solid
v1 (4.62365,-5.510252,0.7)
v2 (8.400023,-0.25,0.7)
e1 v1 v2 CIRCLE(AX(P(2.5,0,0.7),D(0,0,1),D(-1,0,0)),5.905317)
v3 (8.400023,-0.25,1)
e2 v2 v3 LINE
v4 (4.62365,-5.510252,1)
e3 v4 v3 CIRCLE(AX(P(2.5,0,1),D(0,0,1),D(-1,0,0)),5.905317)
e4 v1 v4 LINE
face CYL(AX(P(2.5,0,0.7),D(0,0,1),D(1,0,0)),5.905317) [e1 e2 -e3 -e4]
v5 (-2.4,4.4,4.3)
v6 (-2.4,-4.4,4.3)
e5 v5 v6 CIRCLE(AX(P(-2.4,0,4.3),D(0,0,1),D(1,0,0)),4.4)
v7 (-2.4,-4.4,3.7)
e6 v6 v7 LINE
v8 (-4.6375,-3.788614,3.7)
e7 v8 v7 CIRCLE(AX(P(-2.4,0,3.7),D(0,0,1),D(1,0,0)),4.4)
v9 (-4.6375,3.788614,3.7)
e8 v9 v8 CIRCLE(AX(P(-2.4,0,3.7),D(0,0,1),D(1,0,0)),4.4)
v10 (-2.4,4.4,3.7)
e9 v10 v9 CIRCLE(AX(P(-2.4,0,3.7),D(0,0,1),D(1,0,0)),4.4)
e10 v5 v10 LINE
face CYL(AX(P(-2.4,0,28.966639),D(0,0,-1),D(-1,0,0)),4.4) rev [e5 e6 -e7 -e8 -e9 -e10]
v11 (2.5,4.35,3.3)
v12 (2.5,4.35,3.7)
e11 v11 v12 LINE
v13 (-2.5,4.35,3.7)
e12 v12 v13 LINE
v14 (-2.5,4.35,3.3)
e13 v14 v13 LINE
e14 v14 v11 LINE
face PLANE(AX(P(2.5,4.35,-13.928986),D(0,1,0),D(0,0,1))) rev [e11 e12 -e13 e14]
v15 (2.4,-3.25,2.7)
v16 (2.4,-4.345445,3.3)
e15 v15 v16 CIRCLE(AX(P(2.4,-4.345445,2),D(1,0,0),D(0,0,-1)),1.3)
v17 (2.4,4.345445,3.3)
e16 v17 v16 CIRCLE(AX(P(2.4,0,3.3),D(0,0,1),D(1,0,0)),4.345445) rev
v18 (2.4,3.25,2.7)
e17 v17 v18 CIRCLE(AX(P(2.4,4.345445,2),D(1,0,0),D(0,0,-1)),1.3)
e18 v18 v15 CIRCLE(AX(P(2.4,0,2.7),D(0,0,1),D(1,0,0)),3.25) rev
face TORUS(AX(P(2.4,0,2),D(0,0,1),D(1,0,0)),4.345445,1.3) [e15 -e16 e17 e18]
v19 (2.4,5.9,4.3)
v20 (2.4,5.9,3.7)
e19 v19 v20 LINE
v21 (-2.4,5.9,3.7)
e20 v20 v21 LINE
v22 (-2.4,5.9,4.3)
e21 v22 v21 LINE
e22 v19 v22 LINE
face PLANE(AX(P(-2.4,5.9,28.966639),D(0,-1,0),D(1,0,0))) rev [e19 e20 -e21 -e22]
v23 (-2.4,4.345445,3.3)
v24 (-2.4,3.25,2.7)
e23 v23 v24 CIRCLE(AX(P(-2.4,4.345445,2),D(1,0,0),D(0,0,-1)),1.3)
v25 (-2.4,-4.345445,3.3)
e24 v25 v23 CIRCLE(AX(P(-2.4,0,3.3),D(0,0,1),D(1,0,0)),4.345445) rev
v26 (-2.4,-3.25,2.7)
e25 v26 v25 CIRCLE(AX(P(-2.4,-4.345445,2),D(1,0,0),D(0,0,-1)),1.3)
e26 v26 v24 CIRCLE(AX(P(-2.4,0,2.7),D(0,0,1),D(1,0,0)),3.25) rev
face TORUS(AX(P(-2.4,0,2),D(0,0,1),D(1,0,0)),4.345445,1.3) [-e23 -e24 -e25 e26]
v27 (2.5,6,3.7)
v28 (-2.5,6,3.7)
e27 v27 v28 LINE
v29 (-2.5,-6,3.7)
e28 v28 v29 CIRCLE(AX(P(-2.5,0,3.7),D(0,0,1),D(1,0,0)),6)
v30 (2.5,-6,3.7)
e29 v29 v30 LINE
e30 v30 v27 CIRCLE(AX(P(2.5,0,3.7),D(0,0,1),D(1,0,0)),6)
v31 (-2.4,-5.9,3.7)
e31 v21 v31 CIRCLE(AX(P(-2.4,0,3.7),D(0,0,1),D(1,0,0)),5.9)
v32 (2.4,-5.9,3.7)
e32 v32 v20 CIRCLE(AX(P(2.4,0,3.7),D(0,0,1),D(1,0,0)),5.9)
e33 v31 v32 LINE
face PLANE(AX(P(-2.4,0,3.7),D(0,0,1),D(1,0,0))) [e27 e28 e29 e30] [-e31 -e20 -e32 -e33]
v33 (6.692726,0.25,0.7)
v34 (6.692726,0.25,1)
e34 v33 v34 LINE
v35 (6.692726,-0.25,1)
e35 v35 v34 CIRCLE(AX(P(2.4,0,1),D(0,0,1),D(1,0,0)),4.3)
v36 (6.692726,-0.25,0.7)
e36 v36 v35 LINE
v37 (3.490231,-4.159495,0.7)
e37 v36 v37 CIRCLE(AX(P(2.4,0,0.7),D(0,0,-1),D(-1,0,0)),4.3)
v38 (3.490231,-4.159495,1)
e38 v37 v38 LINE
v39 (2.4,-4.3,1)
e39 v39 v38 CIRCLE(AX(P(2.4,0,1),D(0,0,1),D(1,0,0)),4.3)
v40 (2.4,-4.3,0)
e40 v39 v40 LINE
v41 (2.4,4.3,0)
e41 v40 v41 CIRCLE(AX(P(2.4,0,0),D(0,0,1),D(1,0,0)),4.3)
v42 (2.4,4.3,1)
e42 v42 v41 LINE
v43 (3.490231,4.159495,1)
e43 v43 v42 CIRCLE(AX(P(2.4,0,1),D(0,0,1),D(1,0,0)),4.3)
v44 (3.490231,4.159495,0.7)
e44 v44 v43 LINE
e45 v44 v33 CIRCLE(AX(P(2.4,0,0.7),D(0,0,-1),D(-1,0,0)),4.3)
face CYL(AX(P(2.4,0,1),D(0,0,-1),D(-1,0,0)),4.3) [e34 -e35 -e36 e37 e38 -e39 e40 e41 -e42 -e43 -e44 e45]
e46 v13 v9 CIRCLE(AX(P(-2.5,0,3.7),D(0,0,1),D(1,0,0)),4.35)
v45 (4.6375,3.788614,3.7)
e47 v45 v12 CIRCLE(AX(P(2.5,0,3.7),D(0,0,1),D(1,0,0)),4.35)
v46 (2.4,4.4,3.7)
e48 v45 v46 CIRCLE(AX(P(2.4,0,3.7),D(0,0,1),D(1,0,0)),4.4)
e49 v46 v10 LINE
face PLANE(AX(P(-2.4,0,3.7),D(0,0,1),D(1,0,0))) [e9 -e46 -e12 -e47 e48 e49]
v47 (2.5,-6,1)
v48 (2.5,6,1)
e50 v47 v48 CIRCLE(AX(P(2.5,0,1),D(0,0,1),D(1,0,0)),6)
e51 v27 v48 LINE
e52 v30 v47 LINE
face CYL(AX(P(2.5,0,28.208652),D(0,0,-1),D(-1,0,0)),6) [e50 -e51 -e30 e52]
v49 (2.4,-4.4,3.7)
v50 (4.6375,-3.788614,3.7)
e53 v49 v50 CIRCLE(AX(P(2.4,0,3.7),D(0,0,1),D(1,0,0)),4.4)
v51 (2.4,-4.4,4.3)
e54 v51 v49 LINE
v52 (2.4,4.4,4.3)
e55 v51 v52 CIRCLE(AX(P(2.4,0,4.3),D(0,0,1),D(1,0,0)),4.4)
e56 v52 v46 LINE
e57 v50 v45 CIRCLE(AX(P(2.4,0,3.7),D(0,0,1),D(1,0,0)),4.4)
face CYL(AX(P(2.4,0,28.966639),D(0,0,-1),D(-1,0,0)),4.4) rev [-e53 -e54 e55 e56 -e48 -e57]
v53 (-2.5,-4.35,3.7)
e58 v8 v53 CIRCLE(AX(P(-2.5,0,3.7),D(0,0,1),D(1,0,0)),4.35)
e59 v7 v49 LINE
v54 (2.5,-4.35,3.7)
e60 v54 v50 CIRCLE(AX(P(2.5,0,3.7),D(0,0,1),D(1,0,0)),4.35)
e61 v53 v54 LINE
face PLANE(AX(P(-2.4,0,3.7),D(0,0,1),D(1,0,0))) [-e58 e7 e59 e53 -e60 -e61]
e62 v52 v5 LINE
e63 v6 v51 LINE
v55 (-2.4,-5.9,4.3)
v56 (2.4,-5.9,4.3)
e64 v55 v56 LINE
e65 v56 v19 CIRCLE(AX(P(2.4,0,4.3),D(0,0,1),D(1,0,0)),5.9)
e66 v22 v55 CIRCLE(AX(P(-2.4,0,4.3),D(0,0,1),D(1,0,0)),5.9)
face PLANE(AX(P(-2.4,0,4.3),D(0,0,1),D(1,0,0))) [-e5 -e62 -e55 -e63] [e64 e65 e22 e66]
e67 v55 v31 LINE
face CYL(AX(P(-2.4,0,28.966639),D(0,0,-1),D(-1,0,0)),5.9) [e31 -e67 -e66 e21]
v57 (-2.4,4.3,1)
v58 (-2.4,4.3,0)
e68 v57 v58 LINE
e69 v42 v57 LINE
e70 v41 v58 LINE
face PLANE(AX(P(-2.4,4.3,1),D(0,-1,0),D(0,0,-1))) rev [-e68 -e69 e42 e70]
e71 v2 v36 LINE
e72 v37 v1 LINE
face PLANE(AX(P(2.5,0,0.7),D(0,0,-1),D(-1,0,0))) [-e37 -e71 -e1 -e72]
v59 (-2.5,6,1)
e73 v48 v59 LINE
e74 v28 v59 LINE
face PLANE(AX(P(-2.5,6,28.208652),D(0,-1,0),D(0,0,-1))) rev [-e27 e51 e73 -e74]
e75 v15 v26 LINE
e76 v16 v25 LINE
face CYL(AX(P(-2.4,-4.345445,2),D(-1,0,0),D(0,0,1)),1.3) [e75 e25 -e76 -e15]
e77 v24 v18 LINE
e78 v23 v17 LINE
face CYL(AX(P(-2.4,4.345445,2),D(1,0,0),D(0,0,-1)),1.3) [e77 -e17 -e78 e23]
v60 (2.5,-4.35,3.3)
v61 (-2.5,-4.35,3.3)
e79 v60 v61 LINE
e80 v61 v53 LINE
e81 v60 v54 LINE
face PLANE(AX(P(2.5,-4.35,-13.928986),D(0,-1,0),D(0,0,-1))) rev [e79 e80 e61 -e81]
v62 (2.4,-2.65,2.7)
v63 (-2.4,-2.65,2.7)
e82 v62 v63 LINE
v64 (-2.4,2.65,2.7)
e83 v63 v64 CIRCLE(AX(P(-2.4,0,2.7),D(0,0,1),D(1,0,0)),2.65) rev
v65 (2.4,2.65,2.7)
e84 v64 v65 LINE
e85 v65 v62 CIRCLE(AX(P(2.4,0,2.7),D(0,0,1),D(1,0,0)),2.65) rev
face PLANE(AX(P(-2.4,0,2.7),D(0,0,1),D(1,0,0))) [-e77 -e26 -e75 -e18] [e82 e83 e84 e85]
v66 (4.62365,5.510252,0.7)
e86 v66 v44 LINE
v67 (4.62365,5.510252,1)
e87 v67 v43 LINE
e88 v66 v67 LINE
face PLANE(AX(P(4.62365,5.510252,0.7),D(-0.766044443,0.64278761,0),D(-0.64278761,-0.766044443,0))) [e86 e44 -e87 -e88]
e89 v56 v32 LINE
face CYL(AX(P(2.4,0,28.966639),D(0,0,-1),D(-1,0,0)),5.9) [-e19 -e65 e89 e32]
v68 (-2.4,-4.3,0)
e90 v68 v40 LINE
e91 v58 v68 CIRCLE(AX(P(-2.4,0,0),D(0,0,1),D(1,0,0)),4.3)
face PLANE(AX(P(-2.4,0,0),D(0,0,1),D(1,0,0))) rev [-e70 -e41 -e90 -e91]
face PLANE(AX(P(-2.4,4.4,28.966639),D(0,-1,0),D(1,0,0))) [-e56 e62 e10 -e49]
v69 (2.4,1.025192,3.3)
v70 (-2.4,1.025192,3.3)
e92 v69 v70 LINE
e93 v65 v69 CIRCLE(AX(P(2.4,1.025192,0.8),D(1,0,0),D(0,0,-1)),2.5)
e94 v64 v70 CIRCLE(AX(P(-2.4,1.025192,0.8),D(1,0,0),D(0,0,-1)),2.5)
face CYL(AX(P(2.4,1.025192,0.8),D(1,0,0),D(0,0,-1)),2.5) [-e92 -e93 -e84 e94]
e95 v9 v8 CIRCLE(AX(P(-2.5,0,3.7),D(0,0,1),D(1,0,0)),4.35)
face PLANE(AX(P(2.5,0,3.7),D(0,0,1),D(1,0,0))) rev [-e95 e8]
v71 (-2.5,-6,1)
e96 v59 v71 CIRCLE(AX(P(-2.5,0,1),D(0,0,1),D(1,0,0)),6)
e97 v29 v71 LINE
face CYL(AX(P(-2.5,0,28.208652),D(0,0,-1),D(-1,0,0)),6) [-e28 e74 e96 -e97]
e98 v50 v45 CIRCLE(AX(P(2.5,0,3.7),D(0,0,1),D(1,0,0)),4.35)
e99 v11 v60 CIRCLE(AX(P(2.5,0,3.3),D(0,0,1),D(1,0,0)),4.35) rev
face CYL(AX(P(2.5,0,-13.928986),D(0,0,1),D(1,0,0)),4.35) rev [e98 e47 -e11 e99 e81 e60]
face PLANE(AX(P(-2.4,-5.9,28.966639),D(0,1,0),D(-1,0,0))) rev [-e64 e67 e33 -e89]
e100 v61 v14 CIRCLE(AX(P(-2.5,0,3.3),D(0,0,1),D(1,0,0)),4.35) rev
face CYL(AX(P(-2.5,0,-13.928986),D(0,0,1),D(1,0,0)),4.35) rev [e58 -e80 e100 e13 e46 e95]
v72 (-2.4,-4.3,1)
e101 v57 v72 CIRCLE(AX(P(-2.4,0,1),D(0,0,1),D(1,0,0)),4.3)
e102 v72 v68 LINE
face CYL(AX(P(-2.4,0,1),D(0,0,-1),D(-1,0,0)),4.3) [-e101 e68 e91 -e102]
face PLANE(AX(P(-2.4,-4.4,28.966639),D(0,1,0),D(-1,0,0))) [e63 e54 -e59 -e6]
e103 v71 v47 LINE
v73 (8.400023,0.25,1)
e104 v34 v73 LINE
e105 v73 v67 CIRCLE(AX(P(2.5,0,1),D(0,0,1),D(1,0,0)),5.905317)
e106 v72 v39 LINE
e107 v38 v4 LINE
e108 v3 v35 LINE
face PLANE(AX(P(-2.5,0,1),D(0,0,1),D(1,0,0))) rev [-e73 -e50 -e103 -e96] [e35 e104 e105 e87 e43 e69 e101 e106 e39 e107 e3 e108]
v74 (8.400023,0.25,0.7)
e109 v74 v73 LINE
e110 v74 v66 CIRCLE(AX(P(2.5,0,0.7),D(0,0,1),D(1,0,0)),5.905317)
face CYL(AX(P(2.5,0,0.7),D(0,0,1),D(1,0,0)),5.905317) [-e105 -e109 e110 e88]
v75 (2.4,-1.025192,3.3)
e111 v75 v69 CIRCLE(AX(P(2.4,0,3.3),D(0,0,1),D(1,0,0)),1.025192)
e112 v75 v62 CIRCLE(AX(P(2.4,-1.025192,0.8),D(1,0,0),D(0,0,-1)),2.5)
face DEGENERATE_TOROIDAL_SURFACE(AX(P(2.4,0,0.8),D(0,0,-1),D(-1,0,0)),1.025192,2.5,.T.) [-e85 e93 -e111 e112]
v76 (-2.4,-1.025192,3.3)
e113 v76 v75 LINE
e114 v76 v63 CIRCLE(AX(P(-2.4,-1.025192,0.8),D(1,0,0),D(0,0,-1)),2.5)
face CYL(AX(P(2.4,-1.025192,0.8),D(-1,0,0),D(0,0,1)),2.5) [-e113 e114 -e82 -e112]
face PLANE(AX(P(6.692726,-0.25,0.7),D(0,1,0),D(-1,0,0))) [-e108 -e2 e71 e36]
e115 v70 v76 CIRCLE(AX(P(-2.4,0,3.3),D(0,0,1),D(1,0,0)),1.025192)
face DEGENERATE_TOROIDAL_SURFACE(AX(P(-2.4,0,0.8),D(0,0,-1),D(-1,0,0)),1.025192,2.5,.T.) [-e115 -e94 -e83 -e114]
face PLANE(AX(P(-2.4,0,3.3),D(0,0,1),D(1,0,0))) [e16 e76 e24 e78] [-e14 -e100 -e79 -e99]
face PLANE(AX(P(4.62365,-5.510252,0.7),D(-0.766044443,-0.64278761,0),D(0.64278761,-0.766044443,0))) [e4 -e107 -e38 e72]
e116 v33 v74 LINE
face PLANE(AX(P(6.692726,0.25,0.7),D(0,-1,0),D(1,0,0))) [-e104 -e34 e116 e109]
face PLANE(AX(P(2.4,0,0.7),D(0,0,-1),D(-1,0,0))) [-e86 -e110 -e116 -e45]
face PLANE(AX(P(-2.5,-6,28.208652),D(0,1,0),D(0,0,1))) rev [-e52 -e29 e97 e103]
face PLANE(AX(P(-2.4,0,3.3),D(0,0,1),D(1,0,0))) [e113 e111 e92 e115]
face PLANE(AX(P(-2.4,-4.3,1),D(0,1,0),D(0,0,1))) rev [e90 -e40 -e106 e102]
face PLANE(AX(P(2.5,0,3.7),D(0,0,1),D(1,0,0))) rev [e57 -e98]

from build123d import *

# Parameters (mm, degrees)
EXTRUDE_1_DEPTH     = 1
EXTRUDE_2_DEPTH     = 2.7
EXTRUDE_1_2_DEPTH   = 0.6
CUT_EXTRUDE_1_DEPTH = 1
CUT_EXTRUDE_2_DEPTH = 0.4
FILLET_1_R          = 1.3
FILLET_2_R          = 2.5
EXTRUDE_START       = -0.3
EXTRUDE_3_DEPTH     = 0.3


with BuildPart() as part:
    # Эскиз1 → Extrude 1 (new body)
    with BuildSketch(Plane.XY):
        with BuildLine():
            Line((-2.4, 4.3), (2.4, 4.3))
            ThreePointArc((2.4, 4.3), (6.7, 0), (2.4, -4.3))
            Line((2.4, -4.3), (-2.4, -4.3))
            ThreePointArc((-2.4, -4.3), (-6.7, 0), (-2.4, 4.3))
        make_face()
    extrude(amount=EXTRUDE_1_DEPTH)

    # Эскиз2 → Бобышка-Вытянуть2 (add)
    with BuildSketch(Plane.XY.offset(1)):
        with BuildLine():
            Line((-2.5, 6), (2.5, 6))
            ThreePointArc((2.5, 6), (8.5, 0), (2.5, -6))
            Line((2.5, -6), (-2.5, -6))
            ThreePointArc((-2.5, -6), (-8.5, 0), (-2.5, 6))
        make_face()
    extrude(amount=EXTRUDE_2_DEPTH)

    # Эскиз3 → Extrude 1 2 (add)
    with BuildSketch(Plane.XY.offset(3.7)):
        with BuildLine():
            Line((2.4, -5.9), (-2.4, -5.9))
            ThreePointArc((-2.4, -5.9), (-8.3, 0), (-2.4, 5.9))
            Line((-2.4, 5.9), (2.4, 5.9))
            ThreePointArc((2.4, 5.9), (8.3, 0), (2.4, -5.9))
        make_face()
        with BuildLine():
            Line((2.4, -4.4), (-2.4, -4.4))
            ThreePointArc((-2.4, -4.4), (-6.8, 0), (-2.4, 4.4))
            Line((-2.4, 4.4), (2.4, 4.4))
            ThreePointArc((2.4, 4.4), (6.8, 0), (2.4, -4.4))
        make_face(mode=Mode.SUBTRACT)
    extrude(amount=EXTRUDE_1_2_DEPTH)

    # Эскиз4 → Вырез-Вытянуть1 (cut)
    with BuildSketch(Plane.XY.offset(3.7)):
        with BuildLine():
            Line((-2.4, 3.25), (2.4, 3.25))
            ThreePointArc((2.4, 3.25), (5.65, 0), (2.4, -3.25))
            Line((2.4, -3.25), (-2.4, -3.25))
            ThreePointArc((-2.4, -3.25), (-5.65, 0), (-2.4, 3.25))
        make_face()
        with BuildLine():
            Line((2.4, -2.65), (-2.4, -2.65))
            ThreePointArc((-2.4, -2.65), (-5.05, 0), (-2.4, 2.65))
            Line((-2.4, 2.65), (2.4, 2.65))
            ThreePointArc((2.4, 2.65), (5.05, 0), (2.4, -2.65))
        make_face(mode=Mode.SUBTRACT)
    extrude(amount=-CUT_EXTRUDE_1_DEPTH, mode=Mode.SUBTRACT)

    # Эскиз5 → Вырез-Вытянуть2 (cut)
    with BuildSketch(Plane.XY.offset(3.7)):
        with BuildLine():
            Line((2.5, -4.35), (-2.5, -4.35))
            ThreePointArc((-2.5, -4.35), (-6.85, 0), (-2.5, 4.35))
            Line((-2.5, 4.35), (2.5, 4.35))
            ThreePointArc((2.5, 4.35), (6.85, 0), (2.5, -4.35))
        make_face()
    extrude(amount=-CUT_EXTRUDE_2_DEPTH, mode=Mode.SUBTRACT)

    # Скругление1
    # the kernel refuses this fillet: 1.3 mm, written as the material it takes off along each edge
    with BuildSketch(Plane(origin=(2.4, 0, 3.3), x_dir=(0, -1, 0), z_dir=(-1, 0, 0))) as fillet_1_piece_1:
        with BuildLine():
            CenterArc((4.345445115, -1.3), FILLET_1_R, 90, 57.421029607)
            Line((3.25, -0.6), (3.25, 0))
            Line((3.25, 0), (4.345445115, 0))
        make_face()
    revolve(axis=Axis((2.4, 0, 3.3), (0, 0, 1)), revolution_arc=180, mode=Mode.SUBTRACT)
    with BuildSketch(Plane(origin=(-2.4, 3.25, 3.3), x_dir=(0, 1, 0), z_dir=(1, 0, 0)), Plane(origin=(2.4, -3.25, 3.3), x_dir=(0, -1, 0), z_dir=(-1, 0, 0))) as fillet_1_piece_2:
        with BuildLine():
            CenterArc((1.095445115, -1.3), FILLET_1_R, 90, 57.421029607)
            Line((0, -0.6), (0, 0))
            Line((0, 0), (1.095445115, 0))
        make_face()
    extrude(amount=4.8, mode=Mode.SUBTRACT)
    with BuildSketch(Plane(origin=(-2.4, 0, 3.3), x_dir=(0, 1, 0), z_dir=(1, 0, 0))) as fillet_1_piece_3:
        with BuildLine():
            CenterArc((4.345445115, -1.3), FILLET_1_R, 90, 57.421029607)
            Line((3.25, -0.6), (3.25, 0))
            Line((3.25, 0), (4.345445115, 0))
        make_face()
    revolve(axis=Axis((-2.4, 0, 3.3), (0, 0, 1)), revolution_arc=180, mode=Mode.SUBTRACT)

    # Скругление2
    # the kernel refuses this fillet: 2.5 mm, written as the material it takes off along each edge
    with BuildSketch(Plane(origin=(2.4, 0, 3.3), x_dir=(0, -1, 0), z_dir=(-1, 0, 0))) as fillet_2_piece_1:
        with BuildLine():
            CenterArc((1.025192319, -2.5), FILLET_2_R, 49.464197889, 40.535802111)
            Line((1.025192319, 0), (1.025192319, 0.05))
            Line((1.025192319, 0.05), (2.65, 0.05))
            Line((2.65, 0.05), (2.7, 0))
            ThreePointArc((2.7, 0), (2.7, -0.3), (2.682496154, -0.562))
            Line((2.682496154, -0.562), (2.65, -0.6))
        make_face()
    revolve(axis=Axis((2.4, 0, 3.3), (0, 0, 1)), revolution_arc=180, mode=Mode.SUBTRACT)
    with BuildSketch(Plane(origin=(-2.4, 2.65, 3.3), x_dir=(0, 0, -1), z_dir=(1, 0, 0)), Plane(origin=(2.4, -2.65, 3.3), x_dir=(0, 0, -1), z_dir=(-1, 0, 0))) as fillet_2_piece_2:
        with BuildLine():
            CenterArc((2.5, -1.624807681), FILLET_2_R, 139.464197889, 40.535802111)
            Line((0, -1.624807681), (-0.05, -1.624807681))
            Line((-0.05, -1.624807681), (-0.05, 0))
            Line((-0.05, 0), (0, 0.05))
            ThreePointArc((0, 0.05), (0.3, 0.05), (0.562, 0.032496154))
            Line((0.562, 0.032496154), (0.6, 0))
        make_face()
    extrude(amount=4.8, mode=Mode.SUBTRACT)
    with BuildSketch(Plane(origin=(-2.4, 0, 3.3), x_dir=(0, 1, 0), z_dir=(1, 0, 0))) as fillet_2_piece_3:
        with BuildLine():
            CenterArc((1.025192319, -2.5), FILLET_2_R, 49.464197889, 40.535802111)
            Line((1.025192319, 0), (1.025192319, 0.05))
            Line((1.025192319, 0.05), (2.65, 0.05))
            Line((2.65, 0.05), (2.7, 0))
            ThreePointArc((2.7, 0), (2.7, -0.3), (2.682496154, -0.562))
            Line((2.682496154, -0.562), (2.65, -0.6))
        make_face()
    revolve(axis=Axis((-2.4, 0, 3.3), (0, 0, 1)), revolution_arc=180, mode=Mode.SUBTRACT)

    # Эскиз6 → Бобышка-Вытянуть3 (add)
    with BuildSketch(Plane.XY.offset(1).offset(EXTRUDE_START)):
        with BuildLine():
            Line((6.692726406, 0.25), (8.40002281, 0.25))
            ThreePointArc((8.40002281, 0.25), (7.297123742, 3.443889221), (4.623650475, 5.510252065))
            Line((4.623650475, 5.510252065), (3.490230582, 4.159494835))
            ThreePointArc((3.490230582, 4.159494835), (5.726423597, 2.72486808), (6.692726406, 0.25))
        make_face()
        with BuildLine():
            Line((6.692726406, -0.25), (8.40002281, -0.25))
            ThreePointArc((8.40002281, -0.25), (7.297123742, -3.443889221), (4.623650475, -5.510252065))
            Line((4.623650475, -5.510252065), (3.490230582, -4.159494835))
            ThreePointArc((3.490230582, -4.159494835), (5.726423597, -2.72486808), (6.692726406, -0.25))
        make_face()
    extrude(amount=EXTRUDE_3_DEPTH)


solid = part.part
